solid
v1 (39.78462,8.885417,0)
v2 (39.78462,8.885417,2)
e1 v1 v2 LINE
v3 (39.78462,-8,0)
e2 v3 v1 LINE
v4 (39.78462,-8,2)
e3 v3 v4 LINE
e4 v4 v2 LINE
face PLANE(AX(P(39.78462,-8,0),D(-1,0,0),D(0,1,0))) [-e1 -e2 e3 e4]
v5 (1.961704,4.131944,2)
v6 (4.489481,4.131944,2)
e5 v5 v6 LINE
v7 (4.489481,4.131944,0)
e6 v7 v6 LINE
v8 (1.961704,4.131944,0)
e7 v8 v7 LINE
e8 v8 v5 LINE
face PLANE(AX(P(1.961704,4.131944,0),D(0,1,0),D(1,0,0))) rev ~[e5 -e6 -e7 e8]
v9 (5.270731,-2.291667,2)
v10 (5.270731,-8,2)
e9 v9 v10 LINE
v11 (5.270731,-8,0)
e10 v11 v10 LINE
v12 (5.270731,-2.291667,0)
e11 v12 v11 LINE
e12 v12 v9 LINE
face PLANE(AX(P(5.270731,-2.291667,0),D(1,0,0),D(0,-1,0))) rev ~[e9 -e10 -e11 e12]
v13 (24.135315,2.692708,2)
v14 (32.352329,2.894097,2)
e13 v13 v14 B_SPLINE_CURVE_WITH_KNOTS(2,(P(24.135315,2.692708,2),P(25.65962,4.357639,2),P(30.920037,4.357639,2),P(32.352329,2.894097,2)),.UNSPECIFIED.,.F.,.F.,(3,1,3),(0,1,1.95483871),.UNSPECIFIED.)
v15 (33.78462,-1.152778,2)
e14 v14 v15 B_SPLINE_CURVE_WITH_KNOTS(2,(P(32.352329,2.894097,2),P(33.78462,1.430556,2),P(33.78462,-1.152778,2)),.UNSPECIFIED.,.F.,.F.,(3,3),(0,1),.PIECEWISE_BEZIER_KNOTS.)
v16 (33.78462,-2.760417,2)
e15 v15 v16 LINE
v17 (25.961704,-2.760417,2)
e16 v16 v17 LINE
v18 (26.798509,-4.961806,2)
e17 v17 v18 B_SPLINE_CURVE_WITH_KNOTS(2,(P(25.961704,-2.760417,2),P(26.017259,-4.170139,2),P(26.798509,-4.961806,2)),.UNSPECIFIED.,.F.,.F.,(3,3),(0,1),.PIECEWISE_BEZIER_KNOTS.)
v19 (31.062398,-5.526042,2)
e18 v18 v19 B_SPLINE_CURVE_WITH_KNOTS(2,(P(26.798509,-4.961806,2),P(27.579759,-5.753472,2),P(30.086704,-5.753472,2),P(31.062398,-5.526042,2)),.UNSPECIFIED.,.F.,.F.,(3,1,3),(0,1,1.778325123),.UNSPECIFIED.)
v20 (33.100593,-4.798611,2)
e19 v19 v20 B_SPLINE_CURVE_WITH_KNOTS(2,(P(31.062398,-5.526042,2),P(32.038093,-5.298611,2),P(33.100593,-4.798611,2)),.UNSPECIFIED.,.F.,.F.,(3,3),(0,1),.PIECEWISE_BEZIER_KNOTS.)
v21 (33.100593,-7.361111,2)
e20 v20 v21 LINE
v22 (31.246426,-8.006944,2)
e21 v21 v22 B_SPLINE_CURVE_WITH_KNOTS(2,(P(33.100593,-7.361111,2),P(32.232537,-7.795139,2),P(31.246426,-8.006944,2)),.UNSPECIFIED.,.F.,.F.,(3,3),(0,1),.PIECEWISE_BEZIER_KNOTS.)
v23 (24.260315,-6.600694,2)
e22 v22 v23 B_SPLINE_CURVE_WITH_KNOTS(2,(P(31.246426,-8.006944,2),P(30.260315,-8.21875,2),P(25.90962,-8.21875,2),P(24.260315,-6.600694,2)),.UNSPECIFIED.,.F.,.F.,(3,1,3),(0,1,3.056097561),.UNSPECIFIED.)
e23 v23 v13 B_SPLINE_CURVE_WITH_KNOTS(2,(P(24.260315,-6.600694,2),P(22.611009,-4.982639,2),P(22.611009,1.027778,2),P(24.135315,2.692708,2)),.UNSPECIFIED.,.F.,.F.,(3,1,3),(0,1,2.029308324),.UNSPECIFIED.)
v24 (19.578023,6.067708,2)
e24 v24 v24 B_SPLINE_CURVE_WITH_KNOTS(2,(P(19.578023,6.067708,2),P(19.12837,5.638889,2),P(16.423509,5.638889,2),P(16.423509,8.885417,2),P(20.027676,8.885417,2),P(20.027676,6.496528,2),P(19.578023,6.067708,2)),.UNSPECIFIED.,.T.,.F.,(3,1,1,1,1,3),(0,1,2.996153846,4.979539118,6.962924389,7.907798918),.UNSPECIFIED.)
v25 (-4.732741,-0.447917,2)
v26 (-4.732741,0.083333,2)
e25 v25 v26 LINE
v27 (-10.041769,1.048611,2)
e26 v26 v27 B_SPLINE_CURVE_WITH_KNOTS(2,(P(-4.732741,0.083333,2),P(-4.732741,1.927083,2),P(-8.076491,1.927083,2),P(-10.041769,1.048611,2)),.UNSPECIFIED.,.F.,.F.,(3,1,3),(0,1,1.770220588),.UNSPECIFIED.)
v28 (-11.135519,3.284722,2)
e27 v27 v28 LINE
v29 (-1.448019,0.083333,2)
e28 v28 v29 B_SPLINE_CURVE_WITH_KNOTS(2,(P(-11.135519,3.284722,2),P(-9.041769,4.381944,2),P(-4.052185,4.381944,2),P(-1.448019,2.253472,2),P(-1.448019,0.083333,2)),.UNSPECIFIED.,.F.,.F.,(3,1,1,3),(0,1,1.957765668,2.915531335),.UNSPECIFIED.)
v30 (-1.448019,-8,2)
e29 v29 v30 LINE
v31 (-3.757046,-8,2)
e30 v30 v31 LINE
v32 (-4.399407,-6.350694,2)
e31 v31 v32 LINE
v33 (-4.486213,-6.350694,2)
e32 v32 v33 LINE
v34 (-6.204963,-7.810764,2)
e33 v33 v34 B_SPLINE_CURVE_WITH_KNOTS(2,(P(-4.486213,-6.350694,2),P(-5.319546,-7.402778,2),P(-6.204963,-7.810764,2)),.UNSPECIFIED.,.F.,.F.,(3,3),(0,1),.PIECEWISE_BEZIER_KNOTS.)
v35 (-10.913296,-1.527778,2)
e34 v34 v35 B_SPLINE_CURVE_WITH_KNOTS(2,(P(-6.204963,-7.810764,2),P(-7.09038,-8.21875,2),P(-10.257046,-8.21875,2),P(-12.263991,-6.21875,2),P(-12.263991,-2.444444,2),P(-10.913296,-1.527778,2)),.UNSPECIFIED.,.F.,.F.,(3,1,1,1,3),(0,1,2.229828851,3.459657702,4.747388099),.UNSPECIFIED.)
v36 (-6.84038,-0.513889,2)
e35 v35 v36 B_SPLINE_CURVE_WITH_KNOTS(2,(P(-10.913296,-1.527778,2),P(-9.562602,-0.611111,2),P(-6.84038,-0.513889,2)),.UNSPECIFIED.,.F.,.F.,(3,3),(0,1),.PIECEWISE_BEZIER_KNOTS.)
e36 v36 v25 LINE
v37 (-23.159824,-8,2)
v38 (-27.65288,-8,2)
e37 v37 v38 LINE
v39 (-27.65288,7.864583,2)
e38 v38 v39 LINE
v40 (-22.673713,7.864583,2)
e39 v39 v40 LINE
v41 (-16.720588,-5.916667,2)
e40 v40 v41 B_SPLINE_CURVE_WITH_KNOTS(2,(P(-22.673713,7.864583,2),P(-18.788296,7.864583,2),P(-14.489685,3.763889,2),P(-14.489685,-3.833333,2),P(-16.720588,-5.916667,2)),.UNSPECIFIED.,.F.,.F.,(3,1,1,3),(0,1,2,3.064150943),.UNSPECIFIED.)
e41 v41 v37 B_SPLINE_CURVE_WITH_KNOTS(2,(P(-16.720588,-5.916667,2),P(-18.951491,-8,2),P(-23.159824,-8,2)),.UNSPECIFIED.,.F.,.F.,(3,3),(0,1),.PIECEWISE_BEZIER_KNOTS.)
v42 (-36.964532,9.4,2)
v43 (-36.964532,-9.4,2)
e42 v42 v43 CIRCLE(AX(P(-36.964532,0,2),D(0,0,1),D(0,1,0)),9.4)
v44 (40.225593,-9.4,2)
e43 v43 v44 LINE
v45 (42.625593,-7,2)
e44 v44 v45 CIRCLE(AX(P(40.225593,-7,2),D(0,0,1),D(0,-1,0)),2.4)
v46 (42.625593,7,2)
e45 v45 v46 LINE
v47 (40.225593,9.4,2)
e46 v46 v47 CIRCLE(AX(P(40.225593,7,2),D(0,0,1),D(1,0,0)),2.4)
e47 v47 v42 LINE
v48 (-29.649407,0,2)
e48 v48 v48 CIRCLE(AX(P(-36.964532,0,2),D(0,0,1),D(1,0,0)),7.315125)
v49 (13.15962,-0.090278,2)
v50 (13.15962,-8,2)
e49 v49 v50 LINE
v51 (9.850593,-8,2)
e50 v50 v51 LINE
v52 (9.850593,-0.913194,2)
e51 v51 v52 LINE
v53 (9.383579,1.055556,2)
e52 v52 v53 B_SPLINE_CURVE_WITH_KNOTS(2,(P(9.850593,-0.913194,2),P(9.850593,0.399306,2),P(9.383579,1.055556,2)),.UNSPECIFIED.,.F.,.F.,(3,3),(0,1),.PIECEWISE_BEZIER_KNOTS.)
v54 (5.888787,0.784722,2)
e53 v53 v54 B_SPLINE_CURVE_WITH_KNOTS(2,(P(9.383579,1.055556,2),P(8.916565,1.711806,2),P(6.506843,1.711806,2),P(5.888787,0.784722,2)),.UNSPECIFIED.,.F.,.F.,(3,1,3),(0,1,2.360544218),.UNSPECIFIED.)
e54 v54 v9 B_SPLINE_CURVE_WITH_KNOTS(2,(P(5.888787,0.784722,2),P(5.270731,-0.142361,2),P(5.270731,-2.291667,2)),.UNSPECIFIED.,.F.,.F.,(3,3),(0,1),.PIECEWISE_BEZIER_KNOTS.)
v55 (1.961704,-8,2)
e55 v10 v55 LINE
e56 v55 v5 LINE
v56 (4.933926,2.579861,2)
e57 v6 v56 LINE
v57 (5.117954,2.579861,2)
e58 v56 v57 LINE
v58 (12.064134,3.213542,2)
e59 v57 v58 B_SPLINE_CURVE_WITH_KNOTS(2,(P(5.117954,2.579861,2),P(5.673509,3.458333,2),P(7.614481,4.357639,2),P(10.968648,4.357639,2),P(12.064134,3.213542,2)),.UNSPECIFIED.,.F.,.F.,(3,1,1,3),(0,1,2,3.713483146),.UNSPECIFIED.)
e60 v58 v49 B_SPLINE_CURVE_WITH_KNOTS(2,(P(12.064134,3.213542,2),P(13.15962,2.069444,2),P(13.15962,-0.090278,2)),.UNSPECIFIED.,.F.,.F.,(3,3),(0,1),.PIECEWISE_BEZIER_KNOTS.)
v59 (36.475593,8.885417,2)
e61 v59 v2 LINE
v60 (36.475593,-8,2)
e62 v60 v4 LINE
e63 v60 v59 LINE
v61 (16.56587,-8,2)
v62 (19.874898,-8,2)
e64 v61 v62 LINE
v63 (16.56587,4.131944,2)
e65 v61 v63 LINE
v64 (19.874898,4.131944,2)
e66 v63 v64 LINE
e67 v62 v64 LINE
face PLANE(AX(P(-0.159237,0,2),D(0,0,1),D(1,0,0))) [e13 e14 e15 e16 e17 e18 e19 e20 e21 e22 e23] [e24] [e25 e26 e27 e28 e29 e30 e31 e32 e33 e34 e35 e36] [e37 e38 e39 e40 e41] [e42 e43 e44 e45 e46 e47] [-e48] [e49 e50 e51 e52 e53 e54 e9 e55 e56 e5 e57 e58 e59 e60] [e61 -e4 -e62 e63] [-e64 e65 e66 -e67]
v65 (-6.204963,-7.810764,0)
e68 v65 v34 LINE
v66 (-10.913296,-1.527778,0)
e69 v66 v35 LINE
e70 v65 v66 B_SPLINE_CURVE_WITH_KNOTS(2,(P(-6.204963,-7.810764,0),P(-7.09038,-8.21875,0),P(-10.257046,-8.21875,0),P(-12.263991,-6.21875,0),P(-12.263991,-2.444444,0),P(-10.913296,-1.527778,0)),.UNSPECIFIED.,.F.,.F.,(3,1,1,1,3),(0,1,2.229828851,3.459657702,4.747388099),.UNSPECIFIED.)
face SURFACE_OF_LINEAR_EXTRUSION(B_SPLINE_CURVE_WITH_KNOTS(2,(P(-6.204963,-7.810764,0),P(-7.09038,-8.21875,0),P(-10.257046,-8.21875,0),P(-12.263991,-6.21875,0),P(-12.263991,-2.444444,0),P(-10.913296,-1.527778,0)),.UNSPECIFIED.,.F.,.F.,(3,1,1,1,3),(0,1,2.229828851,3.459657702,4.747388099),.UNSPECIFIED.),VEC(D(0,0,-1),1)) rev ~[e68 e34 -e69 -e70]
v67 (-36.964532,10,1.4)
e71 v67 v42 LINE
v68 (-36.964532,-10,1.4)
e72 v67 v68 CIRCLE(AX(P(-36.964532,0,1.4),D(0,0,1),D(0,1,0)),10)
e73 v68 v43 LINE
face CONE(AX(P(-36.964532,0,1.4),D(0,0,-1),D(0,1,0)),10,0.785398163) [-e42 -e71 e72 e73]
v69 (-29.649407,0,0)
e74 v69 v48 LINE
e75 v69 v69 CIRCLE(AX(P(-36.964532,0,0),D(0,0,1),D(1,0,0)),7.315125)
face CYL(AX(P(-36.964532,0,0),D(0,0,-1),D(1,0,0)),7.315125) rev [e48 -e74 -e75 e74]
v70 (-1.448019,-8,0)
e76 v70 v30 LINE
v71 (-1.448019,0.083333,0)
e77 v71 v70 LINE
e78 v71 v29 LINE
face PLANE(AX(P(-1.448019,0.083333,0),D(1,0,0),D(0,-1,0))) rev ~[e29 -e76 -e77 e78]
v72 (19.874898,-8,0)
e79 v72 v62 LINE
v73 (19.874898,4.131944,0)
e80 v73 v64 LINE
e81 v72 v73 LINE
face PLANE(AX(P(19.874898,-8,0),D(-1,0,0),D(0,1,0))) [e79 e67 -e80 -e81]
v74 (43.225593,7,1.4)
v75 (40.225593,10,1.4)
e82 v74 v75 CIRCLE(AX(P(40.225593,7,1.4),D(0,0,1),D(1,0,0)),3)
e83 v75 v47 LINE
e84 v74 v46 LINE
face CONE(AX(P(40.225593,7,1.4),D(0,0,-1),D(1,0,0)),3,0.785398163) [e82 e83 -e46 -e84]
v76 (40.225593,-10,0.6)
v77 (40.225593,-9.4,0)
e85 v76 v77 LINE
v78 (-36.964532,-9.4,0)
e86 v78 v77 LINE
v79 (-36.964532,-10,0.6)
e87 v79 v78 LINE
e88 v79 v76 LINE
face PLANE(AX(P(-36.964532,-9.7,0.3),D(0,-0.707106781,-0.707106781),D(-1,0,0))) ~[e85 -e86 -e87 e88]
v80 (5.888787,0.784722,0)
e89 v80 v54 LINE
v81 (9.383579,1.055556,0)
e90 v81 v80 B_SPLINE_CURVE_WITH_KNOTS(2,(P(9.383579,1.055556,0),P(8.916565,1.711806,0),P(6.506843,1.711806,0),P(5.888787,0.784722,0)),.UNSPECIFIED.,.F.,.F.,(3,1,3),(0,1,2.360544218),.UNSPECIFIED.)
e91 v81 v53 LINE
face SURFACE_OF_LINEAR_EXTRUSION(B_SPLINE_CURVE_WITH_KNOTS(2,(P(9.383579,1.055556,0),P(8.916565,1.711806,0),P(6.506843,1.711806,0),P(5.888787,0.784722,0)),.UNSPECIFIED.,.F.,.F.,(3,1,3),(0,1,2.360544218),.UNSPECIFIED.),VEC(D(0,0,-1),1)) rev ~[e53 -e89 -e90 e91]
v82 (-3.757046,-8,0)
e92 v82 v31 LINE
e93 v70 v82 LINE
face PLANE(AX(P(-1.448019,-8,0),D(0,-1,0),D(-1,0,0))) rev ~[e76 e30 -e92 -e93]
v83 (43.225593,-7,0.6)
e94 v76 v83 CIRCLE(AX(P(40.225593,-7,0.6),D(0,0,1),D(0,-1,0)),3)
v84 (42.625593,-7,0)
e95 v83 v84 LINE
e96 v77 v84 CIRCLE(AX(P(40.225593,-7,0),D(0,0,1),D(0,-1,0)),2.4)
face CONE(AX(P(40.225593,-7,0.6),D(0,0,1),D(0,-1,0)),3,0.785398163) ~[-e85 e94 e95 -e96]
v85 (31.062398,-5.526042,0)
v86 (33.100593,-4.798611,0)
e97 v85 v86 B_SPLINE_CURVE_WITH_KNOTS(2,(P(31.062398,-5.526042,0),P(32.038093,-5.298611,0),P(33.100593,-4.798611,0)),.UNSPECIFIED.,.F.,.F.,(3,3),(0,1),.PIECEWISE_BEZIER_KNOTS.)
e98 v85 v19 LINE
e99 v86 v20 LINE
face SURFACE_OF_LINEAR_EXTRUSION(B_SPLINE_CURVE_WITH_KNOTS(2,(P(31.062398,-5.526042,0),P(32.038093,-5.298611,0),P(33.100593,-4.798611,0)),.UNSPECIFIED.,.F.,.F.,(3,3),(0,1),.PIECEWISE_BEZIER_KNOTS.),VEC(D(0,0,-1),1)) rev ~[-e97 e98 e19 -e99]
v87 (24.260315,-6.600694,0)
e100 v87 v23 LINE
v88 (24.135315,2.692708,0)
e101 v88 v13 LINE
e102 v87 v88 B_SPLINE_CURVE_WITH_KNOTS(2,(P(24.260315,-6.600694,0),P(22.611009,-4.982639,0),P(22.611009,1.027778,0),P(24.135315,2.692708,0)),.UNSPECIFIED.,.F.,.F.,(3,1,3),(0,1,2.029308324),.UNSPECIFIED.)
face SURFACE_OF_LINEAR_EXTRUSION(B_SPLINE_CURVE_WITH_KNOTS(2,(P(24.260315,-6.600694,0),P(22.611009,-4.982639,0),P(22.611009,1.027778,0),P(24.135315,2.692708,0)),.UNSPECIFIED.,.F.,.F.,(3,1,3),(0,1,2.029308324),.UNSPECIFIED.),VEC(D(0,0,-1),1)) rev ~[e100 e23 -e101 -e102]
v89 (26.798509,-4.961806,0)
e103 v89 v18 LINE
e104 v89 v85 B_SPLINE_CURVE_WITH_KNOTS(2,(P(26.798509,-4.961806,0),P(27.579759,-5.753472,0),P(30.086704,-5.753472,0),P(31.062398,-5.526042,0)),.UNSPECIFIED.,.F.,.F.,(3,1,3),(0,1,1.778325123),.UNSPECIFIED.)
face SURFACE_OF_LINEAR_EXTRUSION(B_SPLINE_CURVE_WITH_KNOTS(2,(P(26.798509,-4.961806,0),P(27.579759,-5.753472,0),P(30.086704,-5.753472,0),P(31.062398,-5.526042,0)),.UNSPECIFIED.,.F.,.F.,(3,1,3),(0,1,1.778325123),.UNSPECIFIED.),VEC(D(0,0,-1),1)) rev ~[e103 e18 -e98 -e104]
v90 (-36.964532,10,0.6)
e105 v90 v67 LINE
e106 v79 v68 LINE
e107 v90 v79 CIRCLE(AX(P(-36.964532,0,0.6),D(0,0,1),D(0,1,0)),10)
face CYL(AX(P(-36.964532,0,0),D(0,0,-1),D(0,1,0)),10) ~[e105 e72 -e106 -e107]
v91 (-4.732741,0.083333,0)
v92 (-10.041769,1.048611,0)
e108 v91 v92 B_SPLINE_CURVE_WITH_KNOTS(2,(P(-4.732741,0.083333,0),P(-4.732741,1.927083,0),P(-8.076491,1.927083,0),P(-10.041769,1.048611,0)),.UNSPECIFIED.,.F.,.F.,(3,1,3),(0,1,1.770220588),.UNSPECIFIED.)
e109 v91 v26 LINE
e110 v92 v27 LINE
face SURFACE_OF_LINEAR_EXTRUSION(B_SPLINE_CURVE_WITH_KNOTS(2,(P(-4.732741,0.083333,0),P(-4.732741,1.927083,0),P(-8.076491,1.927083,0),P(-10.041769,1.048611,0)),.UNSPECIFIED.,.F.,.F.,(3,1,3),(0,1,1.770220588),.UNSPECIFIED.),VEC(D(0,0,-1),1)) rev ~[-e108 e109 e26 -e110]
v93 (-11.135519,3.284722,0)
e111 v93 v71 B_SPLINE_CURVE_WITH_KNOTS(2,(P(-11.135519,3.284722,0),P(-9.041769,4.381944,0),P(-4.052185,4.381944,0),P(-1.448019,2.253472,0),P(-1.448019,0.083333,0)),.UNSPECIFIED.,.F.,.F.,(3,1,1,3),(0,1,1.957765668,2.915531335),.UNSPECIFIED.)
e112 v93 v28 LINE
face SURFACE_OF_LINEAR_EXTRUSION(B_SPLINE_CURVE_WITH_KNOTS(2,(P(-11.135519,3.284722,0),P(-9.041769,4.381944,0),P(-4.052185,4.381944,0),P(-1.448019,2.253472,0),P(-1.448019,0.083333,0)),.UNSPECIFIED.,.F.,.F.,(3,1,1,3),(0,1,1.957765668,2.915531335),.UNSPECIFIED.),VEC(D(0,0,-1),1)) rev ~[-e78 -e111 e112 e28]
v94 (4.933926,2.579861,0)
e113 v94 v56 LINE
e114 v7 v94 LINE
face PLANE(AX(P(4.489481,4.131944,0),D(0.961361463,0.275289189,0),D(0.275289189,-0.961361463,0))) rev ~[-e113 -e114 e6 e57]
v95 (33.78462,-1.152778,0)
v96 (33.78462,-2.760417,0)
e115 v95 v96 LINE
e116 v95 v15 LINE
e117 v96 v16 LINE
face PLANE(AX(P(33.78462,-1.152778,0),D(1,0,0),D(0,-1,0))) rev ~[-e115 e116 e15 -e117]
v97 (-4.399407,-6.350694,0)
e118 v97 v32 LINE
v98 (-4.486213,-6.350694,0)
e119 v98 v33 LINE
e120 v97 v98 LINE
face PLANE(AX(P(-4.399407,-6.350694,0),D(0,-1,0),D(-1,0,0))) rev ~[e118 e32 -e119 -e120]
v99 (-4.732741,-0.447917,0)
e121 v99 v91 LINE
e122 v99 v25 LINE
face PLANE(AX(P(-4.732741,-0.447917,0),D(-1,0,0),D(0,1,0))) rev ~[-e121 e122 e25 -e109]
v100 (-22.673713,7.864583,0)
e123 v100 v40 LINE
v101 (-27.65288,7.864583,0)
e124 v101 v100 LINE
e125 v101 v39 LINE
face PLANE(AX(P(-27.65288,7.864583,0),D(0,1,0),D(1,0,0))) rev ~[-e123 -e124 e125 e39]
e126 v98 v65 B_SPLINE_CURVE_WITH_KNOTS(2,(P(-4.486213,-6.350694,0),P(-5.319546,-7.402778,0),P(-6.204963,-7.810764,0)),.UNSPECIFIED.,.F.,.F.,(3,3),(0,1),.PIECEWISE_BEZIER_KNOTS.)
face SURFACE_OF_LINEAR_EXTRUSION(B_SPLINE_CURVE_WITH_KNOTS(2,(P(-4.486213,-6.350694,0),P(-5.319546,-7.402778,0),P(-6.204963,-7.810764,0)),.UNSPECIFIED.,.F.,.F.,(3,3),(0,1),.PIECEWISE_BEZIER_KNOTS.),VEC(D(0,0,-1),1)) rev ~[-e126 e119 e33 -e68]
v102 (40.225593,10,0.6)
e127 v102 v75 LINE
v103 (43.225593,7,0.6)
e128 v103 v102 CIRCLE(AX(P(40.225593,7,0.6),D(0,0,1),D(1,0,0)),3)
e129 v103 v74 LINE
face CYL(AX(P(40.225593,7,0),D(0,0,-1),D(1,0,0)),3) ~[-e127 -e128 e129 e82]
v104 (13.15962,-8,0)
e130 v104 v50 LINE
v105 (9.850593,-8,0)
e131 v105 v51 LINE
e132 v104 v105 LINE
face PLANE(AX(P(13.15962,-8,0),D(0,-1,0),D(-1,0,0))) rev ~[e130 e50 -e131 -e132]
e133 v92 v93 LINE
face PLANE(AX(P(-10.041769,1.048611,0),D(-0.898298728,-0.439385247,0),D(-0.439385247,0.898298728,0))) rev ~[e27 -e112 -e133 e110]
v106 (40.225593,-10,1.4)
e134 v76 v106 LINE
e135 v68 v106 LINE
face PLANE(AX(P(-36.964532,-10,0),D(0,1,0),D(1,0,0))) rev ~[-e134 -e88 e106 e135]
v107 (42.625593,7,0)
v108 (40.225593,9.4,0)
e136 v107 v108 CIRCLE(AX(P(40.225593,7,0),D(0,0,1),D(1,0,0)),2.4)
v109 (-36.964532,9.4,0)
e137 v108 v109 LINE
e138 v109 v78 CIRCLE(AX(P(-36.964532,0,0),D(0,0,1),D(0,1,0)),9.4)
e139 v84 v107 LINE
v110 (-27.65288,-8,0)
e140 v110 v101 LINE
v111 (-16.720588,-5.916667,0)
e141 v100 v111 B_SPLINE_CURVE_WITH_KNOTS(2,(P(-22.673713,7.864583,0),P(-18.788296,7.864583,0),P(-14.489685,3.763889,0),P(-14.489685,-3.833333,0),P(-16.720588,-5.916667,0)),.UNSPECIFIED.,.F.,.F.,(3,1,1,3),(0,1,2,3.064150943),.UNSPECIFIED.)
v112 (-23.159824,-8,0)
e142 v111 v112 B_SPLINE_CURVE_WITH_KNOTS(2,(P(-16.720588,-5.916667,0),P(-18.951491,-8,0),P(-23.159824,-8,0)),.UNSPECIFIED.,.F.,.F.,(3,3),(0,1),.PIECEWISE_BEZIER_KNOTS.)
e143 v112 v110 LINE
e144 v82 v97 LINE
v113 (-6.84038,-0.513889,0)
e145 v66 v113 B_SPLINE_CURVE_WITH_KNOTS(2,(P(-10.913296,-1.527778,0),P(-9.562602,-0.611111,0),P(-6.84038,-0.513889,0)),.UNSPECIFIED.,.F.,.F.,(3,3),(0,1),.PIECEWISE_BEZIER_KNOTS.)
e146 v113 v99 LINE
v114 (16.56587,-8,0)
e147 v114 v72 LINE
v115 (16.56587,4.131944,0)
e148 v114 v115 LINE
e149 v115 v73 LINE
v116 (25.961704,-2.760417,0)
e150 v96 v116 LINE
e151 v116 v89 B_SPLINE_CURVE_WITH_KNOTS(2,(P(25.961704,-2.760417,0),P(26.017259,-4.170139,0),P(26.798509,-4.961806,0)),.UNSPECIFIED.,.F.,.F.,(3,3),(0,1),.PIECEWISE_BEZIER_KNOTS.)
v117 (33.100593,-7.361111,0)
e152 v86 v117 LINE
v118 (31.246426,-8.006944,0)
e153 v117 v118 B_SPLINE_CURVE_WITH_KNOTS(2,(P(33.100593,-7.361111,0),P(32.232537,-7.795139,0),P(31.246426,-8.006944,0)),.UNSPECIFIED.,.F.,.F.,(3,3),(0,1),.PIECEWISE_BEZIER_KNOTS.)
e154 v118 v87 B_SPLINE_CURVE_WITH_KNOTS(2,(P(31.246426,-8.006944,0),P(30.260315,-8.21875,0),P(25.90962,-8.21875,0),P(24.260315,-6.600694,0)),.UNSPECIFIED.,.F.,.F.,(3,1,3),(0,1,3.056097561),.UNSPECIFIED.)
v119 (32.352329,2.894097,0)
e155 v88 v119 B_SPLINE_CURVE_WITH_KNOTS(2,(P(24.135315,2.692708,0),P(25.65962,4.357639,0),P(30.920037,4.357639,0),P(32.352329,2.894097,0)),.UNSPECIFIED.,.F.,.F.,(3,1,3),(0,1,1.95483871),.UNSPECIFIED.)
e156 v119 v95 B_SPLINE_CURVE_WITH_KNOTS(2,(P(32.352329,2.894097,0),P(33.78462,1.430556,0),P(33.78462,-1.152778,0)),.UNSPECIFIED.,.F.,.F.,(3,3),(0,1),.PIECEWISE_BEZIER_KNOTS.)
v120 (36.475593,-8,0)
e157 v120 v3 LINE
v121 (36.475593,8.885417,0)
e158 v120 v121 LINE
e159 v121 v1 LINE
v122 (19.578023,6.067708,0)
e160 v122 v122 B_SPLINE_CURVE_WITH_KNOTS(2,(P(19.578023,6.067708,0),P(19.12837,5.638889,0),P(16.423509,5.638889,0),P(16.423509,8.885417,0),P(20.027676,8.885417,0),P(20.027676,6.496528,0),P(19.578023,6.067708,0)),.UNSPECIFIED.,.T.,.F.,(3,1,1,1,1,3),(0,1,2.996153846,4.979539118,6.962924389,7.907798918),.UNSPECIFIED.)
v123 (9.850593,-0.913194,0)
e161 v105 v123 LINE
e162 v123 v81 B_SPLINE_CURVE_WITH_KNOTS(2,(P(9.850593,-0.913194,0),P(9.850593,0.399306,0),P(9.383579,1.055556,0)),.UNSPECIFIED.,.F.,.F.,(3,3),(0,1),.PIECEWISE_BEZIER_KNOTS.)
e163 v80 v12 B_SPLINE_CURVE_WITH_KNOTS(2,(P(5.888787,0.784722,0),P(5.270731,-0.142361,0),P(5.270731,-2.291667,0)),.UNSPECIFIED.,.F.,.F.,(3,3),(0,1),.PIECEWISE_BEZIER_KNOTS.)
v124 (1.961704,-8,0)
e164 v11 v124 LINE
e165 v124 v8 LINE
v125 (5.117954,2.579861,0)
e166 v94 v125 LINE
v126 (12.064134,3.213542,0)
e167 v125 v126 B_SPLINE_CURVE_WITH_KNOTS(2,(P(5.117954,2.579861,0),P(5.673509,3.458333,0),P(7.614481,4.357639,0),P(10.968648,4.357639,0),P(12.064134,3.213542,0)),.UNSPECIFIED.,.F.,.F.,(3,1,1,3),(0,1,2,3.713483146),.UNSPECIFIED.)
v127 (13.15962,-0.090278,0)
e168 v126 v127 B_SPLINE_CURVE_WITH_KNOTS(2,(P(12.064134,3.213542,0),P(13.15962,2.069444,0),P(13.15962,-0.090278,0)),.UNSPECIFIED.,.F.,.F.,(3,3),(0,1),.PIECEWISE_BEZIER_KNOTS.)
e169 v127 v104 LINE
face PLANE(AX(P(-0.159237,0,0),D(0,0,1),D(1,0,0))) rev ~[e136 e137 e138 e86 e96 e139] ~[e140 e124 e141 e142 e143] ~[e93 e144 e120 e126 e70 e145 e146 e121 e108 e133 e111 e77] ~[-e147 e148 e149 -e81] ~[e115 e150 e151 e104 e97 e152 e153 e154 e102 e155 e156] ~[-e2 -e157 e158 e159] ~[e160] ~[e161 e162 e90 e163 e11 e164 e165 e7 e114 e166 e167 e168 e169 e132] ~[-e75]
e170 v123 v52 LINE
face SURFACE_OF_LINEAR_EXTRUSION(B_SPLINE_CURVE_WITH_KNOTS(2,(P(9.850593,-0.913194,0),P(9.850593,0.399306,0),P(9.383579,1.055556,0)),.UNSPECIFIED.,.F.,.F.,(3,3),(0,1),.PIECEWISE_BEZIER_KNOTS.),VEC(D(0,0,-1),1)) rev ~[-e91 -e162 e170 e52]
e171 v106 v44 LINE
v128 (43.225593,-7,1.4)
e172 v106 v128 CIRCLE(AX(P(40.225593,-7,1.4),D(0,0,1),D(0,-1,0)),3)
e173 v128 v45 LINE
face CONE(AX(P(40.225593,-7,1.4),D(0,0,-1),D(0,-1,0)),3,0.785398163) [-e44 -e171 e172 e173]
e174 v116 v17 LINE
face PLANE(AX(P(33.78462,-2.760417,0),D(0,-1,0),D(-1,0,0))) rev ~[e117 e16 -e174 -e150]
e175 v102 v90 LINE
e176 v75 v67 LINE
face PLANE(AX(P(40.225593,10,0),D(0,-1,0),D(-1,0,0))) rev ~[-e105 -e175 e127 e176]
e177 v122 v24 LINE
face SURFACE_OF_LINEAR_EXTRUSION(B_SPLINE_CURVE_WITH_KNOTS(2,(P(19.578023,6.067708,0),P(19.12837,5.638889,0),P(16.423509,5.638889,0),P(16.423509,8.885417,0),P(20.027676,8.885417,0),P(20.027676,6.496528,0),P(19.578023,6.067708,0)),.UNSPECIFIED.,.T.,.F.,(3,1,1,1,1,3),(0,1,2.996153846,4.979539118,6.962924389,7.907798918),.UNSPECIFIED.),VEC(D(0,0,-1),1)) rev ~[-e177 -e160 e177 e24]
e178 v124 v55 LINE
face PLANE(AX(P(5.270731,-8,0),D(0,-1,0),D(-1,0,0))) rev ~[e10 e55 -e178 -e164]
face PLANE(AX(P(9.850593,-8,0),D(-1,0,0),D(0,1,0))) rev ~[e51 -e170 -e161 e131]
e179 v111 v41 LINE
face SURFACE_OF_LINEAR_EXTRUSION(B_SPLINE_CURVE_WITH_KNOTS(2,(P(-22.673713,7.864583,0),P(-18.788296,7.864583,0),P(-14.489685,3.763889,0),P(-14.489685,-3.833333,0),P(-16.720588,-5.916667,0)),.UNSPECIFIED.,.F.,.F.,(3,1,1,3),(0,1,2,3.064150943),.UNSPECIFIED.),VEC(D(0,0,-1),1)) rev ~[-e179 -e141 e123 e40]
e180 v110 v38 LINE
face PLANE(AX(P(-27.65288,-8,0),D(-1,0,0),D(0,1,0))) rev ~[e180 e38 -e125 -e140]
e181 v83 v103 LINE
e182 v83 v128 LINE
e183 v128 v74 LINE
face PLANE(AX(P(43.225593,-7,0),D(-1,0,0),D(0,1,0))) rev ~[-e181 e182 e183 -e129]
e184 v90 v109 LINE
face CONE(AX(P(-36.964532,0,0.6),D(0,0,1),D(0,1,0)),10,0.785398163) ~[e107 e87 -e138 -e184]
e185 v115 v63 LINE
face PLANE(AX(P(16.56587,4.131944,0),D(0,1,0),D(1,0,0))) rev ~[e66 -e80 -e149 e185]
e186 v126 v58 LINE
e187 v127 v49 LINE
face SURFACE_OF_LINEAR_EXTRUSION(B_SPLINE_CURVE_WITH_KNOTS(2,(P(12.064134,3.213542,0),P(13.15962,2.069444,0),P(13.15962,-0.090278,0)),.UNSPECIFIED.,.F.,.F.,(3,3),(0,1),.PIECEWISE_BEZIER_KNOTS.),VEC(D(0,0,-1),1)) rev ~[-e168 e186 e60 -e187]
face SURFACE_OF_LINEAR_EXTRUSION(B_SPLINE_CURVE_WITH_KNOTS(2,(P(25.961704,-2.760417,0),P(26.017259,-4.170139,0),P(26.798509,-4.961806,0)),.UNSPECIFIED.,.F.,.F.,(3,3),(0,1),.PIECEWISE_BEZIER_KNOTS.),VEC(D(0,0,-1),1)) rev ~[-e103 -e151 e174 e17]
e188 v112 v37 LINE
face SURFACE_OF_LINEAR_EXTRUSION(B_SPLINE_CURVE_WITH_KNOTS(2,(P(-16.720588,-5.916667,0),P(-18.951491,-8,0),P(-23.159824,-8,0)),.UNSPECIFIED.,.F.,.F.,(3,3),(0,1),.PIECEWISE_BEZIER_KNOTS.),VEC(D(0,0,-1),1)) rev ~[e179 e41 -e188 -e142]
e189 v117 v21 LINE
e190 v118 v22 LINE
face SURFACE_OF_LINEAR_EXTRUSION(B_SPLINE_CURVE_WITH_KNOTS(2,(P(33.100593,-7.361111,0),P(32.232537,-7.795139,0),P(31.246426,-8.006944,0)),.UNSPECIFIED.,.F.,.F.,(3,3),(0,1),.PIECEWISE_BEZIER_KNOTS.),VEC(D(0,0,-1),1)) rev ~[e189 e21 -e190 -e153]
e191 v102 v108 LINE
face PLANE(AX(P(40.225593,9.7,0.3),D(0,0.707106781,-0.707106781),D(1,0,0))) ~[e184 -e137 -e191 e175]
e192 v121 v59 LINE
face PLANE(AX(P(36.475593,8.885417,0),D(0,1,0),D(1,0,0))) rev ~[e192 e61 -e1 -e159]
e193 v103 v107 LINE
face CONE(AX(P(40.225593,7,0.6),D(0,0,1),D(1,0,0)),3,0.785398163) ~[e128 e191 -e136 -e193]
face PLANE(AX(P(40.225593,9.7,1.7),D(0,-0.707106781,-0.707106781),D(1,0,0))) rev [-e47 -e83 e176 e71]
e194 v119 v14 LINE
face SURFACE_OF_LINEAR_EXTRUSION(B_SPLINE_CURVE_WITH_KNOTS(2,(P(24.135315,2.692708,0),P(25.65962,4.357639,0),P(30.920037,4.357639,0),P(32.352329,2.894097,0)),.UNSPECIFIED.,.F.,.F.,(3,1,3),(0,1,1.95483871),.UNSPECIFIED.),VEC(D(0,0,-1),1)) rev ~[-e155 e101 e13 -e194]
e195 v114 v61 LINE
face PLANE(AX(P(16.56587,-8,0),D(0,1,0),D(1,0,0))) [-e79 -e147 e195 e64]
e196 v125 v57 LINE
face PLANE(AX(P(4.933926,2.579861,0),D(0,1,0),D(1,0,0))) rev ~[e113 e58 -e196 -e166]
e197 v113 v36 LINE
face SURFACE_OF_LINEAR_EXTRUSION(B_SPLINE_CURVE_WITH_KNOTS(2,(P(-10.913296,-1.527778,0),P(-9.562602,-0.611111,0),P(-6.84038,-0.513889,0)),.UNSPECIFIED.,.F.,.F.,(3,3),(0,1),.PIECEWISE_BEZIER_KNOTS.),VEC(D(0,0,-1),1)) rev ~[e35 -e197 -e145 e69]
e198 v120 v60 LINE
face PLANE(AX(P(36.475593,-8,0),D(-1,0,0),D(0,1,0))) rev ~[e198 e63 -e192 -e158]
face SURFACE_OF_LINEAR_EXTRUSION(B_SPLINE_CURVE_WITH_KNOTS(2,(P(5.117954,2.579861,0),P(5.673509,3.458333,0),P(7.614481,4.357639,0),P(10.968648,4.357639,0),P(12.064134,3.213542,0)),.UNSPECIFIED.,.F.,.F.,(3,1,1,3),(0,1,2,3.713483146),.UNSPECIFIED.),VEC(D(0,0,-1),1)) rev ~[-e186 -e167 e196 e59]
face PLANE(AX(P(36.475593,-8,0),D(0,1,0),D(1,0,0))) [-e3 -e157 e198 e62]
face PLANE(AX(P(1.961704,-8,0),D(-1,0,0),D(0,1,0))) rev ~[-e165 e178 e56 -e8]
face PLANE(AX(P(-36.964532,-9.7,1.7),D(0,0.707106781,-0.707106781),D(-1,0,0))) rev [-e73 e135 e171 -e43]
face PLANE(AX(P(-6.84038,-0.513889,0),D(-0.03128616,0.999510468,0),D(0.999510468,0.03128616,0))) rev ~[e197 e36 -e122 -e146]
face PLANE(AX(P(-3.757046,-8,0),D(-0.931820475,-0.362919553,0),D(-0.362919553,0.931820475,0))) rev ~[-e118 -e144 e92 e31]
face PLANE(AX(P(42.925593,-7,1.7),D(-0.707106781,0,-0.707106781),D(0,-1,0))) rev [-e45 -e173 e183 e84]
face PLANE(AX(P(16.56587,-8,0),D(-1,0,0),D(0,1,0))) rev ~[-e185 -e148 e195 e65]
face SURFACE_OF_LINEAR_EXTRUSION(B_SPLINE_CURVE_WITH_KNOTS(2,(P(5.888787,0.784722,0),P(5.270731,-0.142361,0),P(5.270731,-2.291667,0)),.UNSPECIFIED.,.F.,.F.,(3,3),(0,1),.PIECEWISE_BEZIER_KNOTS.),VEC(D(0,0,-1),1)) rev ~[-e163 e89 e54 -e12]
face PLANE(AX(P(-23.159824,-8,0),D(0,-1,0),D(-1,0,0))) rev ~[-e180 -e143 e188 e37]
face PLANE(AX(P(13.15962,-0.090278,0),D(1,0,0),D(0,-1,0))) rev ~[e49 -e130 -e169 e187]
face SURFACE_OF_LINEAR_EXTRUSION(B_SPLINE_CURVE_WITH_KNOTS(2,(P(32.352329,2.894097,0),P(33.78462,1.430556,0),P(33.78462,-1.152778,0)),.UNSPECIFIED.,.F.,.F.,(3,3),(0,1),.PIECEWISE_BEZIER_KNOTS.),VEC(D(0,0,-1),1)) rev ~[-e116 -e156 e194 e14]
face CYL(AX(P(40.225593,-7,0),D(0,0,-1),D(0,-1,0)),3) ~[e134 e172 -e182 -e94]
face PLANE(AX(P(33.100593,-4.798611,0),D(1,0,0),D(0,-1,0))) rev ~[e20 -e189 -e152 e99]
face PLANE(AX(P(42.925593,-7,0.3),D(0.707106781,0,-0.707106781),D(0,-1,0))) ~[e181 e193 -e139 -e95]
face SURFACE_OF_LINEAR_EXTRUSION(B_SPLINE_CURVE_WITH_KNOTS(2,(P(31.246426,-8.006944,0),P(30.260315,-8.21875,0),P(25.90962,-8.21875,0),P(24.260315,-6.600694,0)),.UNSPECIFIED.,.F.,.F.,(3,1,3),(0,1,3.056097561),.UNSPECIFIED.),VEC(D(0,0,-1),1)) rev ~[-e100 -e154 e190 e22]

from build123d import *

# Parameters (mm, degrees)
F0_W     = 3.3090277778
F0_H     = 12.1319444444
F0_R     = 7.3151249886
F0_H_2   = 16.8854166667
F1_DEPTH = 2
F2_SIZE  = 0.6


with BuildPart() as f1:
    # F0 (on Top) → F1 (new body)
    with BuildSketch(Plane.XY):
        with BuildLine():
            Line((40.2255926098, 10), (-36.9645323787, 10))
            ThreePointArc((-36.9645323787, 10), (-46.9645323787, 0), (-36.9645323787, -10))
            Line((-36.9645323787, -10), (40.2255926098, -10))
            ThreePointArc((40.2255926098, -10), (42.3469129534, -9.1213203436), (43.2255926098, -7))
            Line((43.2255926098, -7), (43.2255926098, 7))
            ThreePointArc((43.2255926098, 7), (42.3469129534, 9.1213203436), (40.2255926098, 10))
        make_face()
        with BuildLine():
            add(Edge.make_bspline(
                [(-16.6389907235, 5.8142361111), (-14.4896851679, 3.7638888889), (-14.4896851679, 0.0833333333)],
                knots=[0, 0, 0, 1, 1, 1], degree=2))
            add(Edge.make_bspline(
                [(-14.4896851679, 0.0833333333), (-14.4896851679, -3.8333333333), (-16.7205879457, -5.9166666667)],
                knots=[0, 0, 0, 1, 1, 1], degree=2))
            add(Edge.make_bspline(
                [(-16.7205879457, -5.9166666667), (-18.9514907235, -8), (-23.1598240568, -8)],
                knots=[0, 0, 0, 1, 1, 1], degree=2))
            Line((-23.1598240568, -8), (-27.6528796124, -8))
            Line((-27.6528796124, -8), (-27.6528796124, 7.8645833333))
            Line((-27.6528796124, 7.8645833333), (-22.6737129457, 7.8645833333))
            add(Edge.make_bspline(
                [(-22.6737129457, 7.8645833333), (-18.7882962791, 7.8645833333), (-16.6389907235, 5.8142361111)],
                knots=[0, 0, 0, 1, 1, 1], degree=2))
        make_face(mode=Mode.SUBTRACT)
        with BuildLine():
            Line((-1.4480185013, -8), (-3.7570462791, -8))
            Line((-3.7570462791, -8), (-4.3994073902, -6.3506944444))
            Line((-4.3994073902, -6.3506944444), (-4.4862129457, -6.3506944444))
            add(Edge.make_bspline(
                [(-4.4862129457, -6.3506944444), (-5.3195462791, -7.4027777778), (-6.2049629457, -7.8107638889)],
                knots=[0, 0, 0, 1, 1, 1], degree=2))
            add(Edge.make_bspline(
                [(-6.2049629457, -7.8107638889), (-7.0903796124, -8.21875), (-8.5105185013, -8.21875)],
                knots=[0, 0, 0, 1, 1, 1], degree=2))
            add(Edge.make_bspline(
                [(-8.5105185013, -8.21875), (-10.2570462791, -8.21875), (-11.2605185013, -7.21875)],
                knots=[0, 0, 0, 1, 1, 1], degree=2))
            add(Edge.make_bspline(
                [(-11.2605185013, -7.21875), (-12.2639907235, -6.21875), (-12.2639907235, -4.375)],
                knots=[0, 0, 0, 1, 1, 1], degree=2))
            add(Edge.make_bspline(
                [(-12.2639907235, -4.375), (-12.2639907235, -2.4444444444), (-10.9132962791, -1.5277777778)],
                knots=[0, 0, 0, 1, 1, 1], degree=2))
            add(Edge.make_bspline(
                [(-10.9132962791, -1.5277777778), (-9.5626018346, -0.6111111111), (-6.8403796124, -0.5138888889)],
                knots=[0, 0, 0, 1, 1, 1], degree=2))
            Line((-6.8403796124, -0.5138888889), (-4.7327407235, -0.4479166667))
            Line((-4.7327407235, -0.4479166667), (-4.7327407235, 0.0833333333))
            add(Edge.make_bspline(
                [(-4.7327407235, 0.0833333333), (-4.7327407235, 1.9270833333), (-6.6216296124, 1.9270833333)],
                knots=[0, 0, 0, 1, 1, 1], degree=2))
            add(Edge.make_bspline(
                [(-6.6216296124, 1.9270833333), (-8.0764907235, 1.9270833333), (-10.0417685013, 1.0486111111)],
                knots=[0, 0, 0, 1, 1, 1], degree=2))
            Line((-10.0417685013, 1.0486111111), (-11.1355185013, 3.2847222222))
            add(Edge.make_bspline(
                [(-11.1355185013, 3.2847222222), (-9.0417685013, 4.3819444444), (-6.4931573902, 4.3819444444)],
                knots=[0, 0, 0, 1, 1, 1], degree=2))
            add(Edge.make_bspline(
                [(-6.4931573902, 4.3819444444), (-4.0521851679, 4.3819444444), (-2.7501018346, 3.3177083333)],
                knots=[0, 0, 0, 1, 1, 1], degree=2))
            add(Edge.make_bspline(
                [(-2.7501018346, 3.3177083333), (-1.4480185013, 2.2534722222), (-1.4480185013, 0.0833333333)],
                knots=[0, 0, 0, 1, 1, 1], degree=2))
            Line((-1.4480185013, 0.0833333333), (-1.4480185013, -8))
        make_face(mode=Mode.SUBTRACT)
        with BuildLine():
            Line((13.1596203876, -0.0902777778), (13.1596203876, -8))
            Line((13.1596203876, -8), (9.8505926098, -8))
            Line((9.8505926098, -8), (9.8505926098, -0.9131944444))
            add(Edge.make_bspline(
                [(9.8505926098, -0.9131944444), (9.8505926098, 0.3993055556), (9.3835787209, 1.0555555556)],
                knots=[0, 0, 0, 1, 1, 1], degree=2))
            add(Edge.make_bspline(
                [(9.3835787209, 1.0555555556), (8.9165648321, 1.7118055556), (7.8957314987, 1.7118055556)],
                knots=[0, 0, 0, 1, 1, 1], degree=2))
            add(Edge.make_bspline(
                [(7.8957314987, 1.7118055556), (6.5068426098, 1.7118055556), (5.8887870543, 0.7847222222)],
                knots=[0, 0, 0, 1, 1, 1], degree=2))
            add(Edge.make_bspline(
                [(5.8887870543, 0.7847222222), (5.2707314987, -0.1423611111), (5.2707314987, -2.2916666667)],
                knots=[0, 0, 0, 1, 1, 1], degree=2))
            Line((5.2707314987, -2.2916666667), (5.2707314987, -8))
            Line((5.2707314987, -8), (1.9617037209, -8))
            Line((1.9617037209, -8), (1.9617037209, 4.1319444444))
            Line((1.9617037209, 4.1319444444), (4.4894814987, 4.1319444444))
            Line((4.4894814987, 4.1319444444), (4.9339259432, 2.5798611111))
            Line((4.9339259432, 2.5798611111), (5.1179537209, 2.5798611111))
            add(Edge.make_bspline(
                [(5.1179537209, 2.5798611111), (5.6735092765, 3.4583333333), (6.6439953876, 3.9079861111)],
                knots=[0, 0, 0, 1, 1, 1], degree=2))
            add(Edge.make_bspline(
                [(6.6439953876, 3.9079861111), (7.6144814987, 4.3576388889), (8.8505926098, 4.3576388889)],
                knots=[0, 0, 0, 1, 1, 1], degree=2))
            add(Edge.make_bspline(
                [(8.8505926098, 4.3576388889), (10.9686481654, 4.3576388889), (12.0641342765, 3.2135416667)],
                knots=[0, 0, 0, 1, 1, 1], degree=2))
            add(Edge.make_bspline(
                [(12.0641342765, 3.2135416667), (13.1596203876, 2.0694444444), (13.1596203876, -0.0902777778)],
                knots=[0, 0, 0, 1, 1, 1], degree=2))
        make_face(mode=Mode.SUBTRACT)
        with Locations((18.2203842765, -1.9340277778)):
            Rectangle(F0_W, F0_H, mode=Mode.SUBTRACT)
        with BuildLine():
            add(Edge.make_bspline(
                [(31.2464259432, -8.0069444444), (30.2603148321, -8.21875), (28.8367037209, -8.21875)],
                knots=[0, 0, 0, 1, 1, 1], degree=2))
            add(Edge.make_bspline(
                [(28.8367037209, -8.21875), (25.9096203876, -8.21875), (24.2603148321, -6.6006944444)],
                knots=[0, 0, 0, 1, 1, 1], degree=2))
            add(Edge.make_bspline(
                [(24.2603148321, -6.6006944444), (22.6110092765, -4.9826388889), (22.6110092765, -2.0208333333)],
                knots=[0, 0, 0, 1, 1, 1], degree=2))
            add(Edge.make_bspline(
                [(22.6110092765, -2.0208333333), (22.6110092765, 1.0277777778), (24.1353148321, 2.6927083333)],
                knots=[0, 0, 0, 1, 1, 1], degree=2))
            add(Edge.make_bspline(
                [(24.1353148321, 2.6927083333), (25.6596203876, 4.3576388889), (28.3505926098, 4.3576388889)],
                knots=[0, 0, 0, 1, 1, 1], degree=2))
            add(Edge.make_bspline(
                [(28.3505926098, 4.3576388889), (30.9200370543, 4.3576388889), (32.3523287209, 2.8940972222)],
                knots=[0, 0, 0, 1, 1, 1], degree=2))
            add(Edge.make_bspline(
                [(32.3523287209, 2.8940972222), (33.7846203876, 1.4305555556), (33.7846203876, -1.1527777778)],
                knots=[0, 0, 0, 1, 1, 1], degree=2))
            Line((33.7846203876, -1.1527777778), (33.7846203876, -2.7604166667))
            Line((33.7846203876, -2.7604166667), (25.9617037209, -2.7604166667))
            add(Edge.make_bspline(
                [(25.9617037209, -2.7604166667), (26.0172592765, -4.1701388889), (26.7985092765, -4.9618055556)],
                knots=[0, 0, 0, 1, 1, 1], degree=2))
            add(Edge.make_bspline(
                [(26.7985092765, -4.9618055556), (27.5797592765, -5.7534722222), (28.9894814987, -5.7534722222)],
                knots=[0, 0, 0, 1, 1, 1], degree=2))
            add(Edge.make_bspline(
                [(28.9894814987, -5.7534722222), (30.0867037209, -5.7534722222), (31.0623981654, -5.5260416667)],
                knots=[0, 0, 0, 1, 1, 1], degree=2))
            add(Edge.make_bspline(
                [(31.0623981654, -5.5260416667), (32.0380926098, -5.2986111111), (33.1005926098, -4.7986111111)],
                knots=[0, 0, 0, 1, 1, 1], degree=2))
            Line((33.1005926098, -4.7986111111), (33.1005926098, -7.3611111111))
            add(Edge.make_bspline(
                [(33.1005926098, -7.3611111111), (32.2325370543, -7.7951388889), (31.2464259432, -8.0069444444)],
                knots=[0, 0, 0, 1, 1, 1], degree=2))
        make_face(mode=Mode.SUBTRACT)
        with Locations((-36.9645323787, 0)):
            Circle(F0_R, mode=Mode.SUBTRACT)
        with Locations((38.1301064987, 0.4427083333)):
            Rectangle(F0_W, F0_H_2, mode=Mode.SUBTRACT)
        with BuildLine():
            add(Edge.make_bspline(
                [(18.2255926098, 5.6388888889), (16.4235092765, 5.6388888889), (16.4235092765, 7.2673611111)],
                knots=[0, 0, 0, 1, 1, 1], degree=2))
            add(Edge.make_bspline(
                [(16.4235092765, 7.2673611111), (16.4235092765, 8.8854166667), (18.2255926098, 8.8854166667)],
                knots=[0, 0, 0, 1, 1, 1], degree=2))
            add(Edge.make_bspline(
                [(18.2255926098, 8.8854166667), (20.0276759432, 8.8854166667), (20.0276759432, 7.2673611111)],
                knots=[0, 0, 0, 1, 1, 1], degree=2))
            add(Edge.make_bspline(
                [(20.0276759432, 7.2673611111), (20.0276759432, 6.4965277778), (19.5780231654, 6.0677083333)],
                knots=[0, 0, 0, 1, 1, 1], degree=2))
            add(Edge.make_bspline(
                [(19.5780231654, 6.0677083333), (19.1283703876, 5.6388888889), (18.2255926098, 5.6388888889)],
                knots=[0, 0, 0, 1, 1, 1], degree=2))
        make_face(mode=Mode.SUBTRACT)
    extrude(amount=F1_DEPTH)

    # F2
    f2_edges = [f1.edges().sort_by_distance(p)[0] for p in [
        (1.63053, 10, 2),
        (1.63053, 10, 0),
    ]]
    chamfer(f2_edges, length=F2_SIZE)


solid = f1.part
